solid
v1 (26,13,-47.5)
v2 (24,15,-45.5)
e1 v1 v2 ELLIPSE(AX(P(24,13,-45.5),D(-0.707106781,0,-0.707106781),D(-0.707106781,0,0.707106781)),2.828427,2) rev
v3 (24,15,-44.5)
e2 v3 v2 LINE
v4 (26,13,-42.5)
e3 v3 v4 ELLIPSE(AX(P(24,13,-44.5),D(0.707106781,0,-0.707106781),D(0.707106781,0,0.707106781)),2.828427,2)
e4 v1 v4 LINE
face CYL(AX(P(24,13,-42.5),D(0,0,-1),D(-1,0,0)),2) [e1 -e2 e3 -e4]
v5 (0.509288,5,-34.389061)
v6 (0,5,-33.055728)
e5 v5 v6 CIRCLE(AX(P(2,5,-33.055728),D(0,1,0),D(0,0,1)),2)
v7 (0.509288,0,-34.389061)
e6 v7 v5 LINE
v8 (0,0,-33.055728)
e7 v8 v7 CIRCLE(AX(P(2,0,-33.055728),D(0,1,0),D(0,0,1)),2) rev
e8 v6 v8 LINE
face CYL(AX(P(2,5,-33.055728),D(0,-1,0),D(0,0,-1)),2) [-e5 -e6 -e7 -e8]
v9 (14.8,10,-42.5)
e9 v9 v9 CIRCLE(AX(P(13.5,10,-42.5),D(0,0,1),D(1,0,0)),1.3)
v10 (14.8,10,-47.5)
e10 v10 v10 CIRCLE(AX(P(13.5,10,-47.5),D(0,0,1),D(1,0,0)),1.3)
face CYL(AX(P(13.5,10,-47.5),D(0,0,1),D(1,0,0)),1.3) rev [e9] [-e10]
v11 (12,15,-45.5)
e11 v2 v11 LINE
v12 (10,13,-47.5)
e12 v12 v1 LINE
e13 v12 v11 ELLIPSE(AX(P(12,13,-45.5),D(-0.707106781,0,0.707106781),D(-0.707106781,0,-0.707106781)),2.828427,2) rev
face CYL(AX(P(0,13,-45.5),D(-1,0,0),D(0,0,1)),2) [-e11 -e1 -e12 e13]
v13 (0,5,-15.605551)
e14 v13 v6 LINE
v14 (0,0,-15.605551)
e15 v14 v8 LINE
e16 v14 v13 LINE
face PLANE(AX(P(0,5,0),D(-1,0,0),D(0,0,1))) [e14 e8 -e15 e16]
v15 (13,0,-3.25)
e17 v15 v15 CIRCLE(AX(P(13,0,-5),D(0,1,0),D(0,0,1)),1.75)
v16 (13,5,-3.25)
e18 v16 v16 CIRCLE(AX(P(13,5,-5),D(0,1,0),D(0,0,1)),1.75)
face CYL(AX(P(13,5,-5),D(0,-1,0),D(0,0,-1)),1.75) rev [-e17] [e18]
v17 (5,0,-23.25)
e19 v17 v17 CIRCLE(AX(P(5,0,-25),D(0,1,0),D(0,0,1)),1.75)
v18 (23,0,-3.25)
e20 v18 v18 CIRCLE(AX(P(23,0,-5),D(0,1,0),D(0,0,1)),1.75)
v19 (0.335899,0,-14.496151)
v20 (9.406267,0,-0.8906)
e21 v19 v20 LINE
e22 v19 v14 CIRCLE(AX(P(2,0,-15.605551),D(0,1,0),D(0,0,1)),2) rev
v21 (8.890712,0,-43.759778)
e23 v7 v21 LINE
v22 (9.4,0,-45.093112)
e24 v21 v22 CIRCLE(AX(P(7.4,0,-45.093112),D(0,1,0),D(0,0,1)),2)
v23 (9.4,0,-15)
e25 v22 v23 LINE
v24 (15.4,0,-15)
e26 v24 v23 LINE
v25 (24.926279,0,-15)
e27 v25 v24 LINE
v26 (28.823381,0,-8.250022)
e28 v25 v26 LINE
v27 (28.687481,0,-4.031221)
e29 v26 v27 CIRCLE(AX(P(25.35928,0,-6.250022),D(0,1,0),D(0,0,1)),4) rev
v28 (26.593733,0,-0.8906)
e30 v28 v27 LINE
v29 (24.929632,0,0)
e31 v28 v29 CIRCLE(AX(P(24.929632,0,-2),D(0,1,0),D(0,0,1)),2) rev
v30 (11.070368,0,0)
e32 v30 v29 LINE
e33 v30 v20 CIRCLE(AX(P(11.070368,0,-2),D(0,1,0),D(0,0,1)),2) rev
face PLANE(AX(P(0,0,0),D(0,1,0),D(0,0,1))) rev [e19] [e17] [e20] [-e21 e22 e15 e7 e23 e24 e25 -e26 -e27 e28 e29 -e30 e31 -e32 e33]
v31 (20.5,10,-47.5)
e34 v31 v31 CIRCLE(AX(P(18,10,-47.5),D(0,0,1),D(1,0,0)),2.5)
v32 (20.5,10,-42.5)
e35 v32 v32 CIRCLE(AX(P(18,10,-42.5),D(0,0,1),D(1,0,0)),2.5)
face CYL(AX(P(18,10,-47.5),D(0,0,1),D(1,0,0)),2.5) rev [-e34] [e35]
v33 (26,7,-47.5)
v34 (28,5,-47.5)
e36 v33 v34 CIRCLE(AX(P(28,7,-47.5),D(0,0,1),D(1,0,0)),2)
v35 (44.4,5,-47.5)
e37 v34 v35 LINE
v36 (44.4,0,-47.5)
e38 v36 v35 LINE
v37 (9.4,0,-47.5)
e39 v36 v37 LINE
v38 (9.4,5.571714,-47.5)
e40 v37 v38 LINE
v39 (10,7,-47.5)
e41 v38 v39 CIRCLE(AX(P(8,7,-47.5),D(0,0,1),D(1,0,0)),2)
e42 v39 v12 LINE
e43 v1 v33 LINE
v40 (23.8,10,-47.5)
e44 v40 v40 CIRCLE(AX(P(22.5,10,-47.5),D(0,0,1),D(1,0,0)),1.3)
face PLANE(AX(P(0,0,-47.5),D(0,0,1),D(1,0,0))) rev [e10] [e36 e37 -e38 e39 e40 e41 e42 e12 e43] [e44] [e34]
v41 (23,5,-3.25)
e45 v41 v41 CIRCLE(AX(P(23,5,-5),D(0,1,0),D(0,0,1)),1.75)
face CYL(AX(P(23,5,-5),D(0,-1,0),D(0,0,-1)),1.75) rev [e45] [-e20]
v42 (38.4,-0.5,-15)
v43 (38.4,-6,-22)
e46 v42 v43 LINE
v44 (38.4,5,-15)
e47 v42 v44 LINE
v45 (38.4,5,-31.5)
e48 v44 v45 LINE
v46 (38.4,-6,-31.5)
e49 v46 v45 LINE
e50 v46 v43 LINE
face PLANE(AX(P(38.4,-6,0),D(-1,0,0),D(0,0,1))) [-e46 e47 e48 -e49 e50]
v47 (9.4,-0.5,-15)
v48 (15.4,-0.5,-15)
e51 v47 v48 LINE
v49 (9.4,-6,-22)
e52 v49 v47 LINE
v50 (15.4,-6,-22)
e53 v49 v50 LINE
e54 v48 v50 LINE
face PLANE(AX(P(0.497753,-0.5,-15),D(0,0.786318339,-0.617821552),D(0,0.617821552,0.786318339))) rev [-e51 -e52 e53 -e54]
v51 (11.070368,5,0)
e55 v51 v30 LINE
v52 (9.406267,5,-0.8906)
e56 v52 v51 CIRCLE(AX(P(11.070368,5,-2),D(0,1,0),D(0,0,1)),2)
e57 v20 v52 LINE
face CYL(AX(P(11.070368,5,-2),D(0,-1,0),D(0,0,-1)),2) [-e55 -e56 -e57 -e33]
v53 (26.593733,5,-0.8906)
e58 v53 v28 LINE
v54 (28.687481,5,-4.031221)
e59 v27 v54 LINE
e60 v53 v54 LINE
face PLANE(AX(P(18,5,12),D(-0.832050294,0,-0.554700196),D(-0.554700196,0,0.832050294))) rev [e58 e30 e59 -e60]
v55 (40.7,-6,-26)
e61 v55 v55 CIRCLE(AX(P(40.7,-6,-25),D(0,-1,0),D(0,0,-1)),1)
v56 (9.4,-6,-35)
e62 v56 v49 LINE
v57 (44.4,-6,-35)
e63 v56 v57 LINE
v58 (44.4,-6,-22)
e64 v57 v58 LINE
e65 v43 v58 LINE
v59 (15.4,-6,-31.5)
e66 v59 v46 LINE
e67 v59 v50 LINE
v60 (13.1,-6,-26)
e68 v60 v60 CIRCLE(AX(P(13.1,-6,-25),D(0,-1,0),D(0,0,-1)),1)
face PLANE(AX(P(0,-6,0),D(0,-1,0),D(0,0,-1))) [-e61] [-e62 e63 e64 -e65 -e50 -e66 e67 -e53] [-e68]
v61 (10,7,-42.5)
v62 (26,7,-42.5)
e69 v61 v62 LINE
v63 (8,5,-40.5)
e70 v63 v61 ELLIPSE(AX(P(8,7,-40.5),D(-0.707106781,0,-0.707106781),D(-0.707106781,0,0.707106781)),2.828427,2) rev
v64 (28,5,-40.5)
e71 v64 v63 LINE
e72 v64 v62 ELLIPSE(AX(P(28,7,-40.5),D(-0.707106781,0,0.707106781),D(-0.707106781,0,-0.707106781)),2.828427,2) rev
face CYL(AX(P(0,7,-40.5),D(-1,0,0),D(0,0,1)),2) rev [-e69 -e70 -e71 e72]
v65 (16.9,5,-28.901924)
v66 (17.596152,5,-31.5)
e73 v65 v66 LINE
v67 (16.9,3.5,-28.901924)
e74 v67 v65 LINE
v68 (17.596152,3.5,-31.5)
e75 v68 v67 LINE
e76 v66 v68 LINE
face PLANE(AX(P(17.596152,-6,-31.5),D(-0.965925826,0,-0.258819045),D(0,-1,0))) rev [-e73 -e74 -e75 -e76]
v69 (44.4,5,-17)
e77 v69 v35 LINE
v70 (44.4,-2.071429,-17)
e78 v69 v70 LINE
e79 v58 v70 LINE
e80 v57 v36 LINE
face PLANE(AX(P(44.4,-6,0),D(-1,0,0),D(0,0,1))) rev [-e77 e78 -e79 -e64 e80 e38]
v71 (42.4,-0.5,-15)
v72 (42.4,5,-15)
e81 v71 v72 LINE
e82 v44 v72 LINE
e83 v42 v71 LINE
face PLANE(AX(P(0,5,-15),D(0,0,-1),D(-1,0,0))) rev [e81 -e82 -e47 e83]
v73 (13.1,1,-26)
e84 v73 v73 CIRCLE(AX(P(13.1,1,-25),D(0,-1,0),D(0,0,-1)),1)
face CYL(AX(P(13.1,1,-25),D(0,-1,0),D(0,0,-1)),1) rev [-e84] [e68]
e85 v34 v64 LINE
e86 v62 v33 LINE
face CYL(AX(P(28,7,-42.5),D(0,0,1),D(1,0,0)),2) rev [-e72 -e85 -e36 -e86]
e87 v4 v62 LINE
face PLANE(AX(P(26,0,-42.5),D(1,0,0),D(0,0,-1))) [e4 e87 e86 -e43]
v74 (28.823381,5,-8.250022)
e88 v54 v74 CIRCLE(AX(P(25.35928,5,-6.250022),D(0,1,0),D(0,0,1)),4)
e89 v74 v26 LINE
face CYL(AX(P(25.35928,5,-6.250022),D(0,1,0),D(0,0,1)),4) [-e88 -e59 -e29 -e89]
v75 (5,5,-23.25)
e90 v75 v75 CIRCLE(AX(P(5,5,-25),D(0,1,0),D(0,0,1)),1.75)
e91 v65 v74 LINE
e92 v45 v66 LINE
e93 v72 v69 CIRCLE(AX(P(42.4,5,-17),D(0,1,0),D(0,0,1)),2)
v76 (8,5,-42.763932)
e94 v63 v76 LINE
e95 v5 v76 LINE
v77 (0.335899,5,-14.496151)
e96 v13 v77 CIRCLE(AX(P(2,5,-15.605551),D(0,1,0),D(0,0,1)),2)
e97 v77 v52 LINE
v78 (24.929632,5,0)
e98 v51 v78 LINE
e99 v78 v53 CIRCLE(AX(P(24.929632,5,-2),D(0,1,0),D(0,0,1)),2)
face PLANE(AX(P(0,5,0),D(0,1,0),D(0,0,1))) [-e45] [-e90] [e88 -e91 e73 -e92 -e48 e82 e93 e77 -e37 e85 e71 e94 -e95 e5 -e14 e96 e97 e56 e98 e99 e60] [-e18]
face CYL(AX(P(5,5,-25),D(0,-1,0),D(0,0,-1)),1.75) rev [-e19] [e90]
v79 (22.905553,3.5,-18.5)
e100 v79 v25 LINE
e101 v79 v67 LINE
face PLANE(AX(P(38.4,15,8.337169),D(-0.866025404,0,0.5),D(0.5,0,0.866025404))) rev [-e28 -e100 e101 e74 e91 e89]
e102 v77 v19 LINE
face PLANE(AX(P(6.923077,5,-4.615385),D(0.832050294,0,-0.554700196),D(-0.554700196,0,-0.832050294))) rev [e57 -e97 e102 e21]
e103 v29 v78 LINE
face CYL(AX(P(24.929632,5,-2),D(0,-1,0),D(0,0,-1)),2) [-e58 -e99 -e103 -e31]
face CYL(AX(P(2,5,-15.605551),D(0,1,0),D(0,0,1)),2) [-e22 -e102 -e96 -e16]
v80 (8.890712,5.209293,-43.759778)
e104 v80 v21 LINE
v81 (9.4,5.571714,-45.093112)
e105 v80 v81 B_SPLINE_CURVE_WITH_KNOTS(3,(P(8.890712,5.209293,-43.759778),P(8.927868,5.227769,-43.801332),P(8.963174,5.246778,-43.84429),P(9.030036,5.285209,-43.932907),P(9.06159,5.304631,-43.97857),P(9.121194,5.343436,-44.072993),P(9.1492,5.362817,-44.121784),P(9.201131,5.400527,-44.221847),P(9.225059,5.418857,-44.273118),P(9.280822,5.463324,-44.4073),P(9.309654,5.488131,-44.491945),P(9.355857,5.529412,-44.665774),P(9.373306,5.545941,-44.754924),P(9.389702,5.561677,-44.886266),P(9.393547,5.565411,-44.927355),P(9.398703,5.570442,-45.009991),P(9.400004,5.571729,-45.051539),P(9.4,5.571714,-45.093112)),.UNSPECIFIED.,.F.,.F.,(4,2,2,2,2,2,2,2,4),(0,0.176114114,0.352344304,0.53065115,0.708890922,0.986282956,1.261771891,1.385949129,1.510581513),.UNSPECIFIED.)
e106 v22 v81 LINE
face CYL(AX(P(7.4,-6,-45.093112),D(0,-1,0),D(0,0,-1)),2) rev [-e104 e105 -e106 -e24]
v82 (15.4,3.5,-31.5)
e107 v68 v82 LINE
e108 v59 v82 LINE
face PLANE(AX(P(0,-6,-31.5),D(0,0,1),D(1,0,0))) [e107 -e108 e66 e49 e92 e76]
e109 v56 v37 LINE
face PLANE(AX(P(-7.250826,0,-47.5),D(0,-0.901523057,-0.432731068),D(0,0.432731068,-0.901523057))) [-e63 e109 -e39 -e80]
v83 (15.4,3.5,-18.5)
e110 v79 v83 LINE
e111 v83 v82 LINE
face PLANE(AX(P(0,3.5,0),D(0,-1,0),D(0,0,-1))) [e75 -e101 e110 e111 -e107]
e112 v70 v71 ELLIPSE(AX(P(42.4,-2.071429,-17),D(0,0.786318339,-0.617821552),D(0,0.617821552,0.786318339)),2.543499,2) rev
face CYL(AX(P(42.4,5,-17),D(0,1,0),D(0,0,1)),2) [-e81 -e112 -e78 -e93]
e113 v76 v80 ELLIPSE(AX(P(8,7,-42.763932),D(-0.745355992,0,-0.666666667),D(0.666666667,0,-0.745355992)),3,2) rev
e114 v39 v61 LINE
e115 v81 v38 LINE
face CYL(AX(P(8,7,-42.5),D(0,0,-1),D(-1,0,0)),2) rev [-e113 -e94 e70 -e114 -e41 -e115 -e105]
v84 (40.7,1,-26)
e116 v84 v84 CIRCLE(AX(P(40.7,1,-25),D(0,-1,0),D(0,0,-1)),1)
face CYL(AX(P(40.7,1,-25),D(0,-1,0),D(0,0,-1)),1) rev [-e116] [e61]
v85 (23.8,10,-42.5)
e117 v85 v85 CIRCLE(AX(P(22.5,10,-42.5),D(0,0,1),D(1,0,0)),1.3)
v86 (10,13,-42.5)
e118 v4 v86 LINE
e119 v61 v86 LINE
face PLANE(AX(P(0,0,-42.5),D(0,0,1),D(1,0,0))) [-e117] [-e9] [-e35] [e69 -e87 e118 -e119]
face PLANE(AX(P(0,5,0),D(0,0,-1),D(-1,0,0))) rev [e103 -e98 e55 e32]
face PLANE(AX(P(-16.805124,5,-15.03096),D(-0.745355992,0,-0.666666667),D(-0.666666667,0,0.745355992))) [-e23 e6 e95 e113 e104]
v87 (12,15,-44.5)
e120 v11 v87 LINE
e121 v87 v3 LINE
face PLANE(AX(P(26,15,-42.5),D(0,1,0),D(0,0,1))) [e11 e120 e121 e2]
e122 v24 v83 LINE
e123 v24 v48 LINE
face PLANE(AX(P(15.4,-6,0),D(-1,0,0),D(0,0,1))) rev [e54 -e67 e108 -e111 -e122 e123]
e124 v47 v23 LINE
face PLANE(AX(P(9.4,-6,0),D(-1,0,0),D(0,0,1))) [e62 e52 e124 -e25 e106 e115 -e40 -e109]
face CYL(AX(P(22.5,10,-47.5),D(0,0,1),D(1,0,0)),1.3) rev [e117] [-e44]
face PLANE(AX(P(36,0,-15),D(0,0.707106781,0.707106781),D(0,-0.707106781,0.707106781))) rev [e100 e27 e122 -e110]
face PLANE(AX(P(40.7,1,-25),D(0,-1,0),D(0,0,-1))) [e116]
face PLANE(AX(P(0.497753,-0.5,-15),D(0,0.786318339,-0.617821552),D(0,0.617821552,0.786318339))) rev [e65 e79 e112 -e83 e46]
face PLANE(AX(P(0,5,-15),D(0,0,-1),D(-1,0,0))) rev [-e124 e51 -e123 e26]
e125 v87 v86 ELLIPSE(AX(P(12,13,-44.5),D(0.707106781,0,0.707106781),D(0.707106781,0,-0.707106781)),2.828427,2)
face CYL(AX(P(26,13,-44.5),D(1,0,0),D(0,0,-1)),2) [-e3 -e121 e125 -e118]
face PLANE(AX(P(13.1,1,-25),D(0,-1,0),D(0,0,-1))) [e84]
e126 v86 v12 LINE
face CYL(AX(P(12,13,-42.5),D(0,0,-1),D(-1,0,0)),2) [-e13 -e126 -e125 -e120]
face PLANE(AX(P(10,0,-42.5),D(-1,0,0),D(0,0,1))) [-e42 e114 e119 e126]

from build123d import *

# Parameters (mm, degrees)
SKETCH1_R                = 1.75
SKETCH1_W                = 7.2
SKETCH1_H                = 5.4
BOSS_EXTRUDE1_DEPTH      = 5
FILLET5_RADIUS           = 10
FILLET5_LENGTH           = 5
FILLET2_R                = 5.4
FILLET6_R                = 5.4
SKETCH3_W                = 35
SKETCH3_H                = 20
SKETCH3_W_2              = 23
SKETCH3_H_2              = 13
BOSS_EXTRUDE4_DEPTH      = 6
SKETCH5_W                = 23
SKETCH5_H                = 13
CUT_EXTRUDE1_DEPTH       = 3.5
CUT_EXTRUDE2_DEPTH       = 76.239617224
SKETCH9_R                = 1
CUT_EXTRUDE4_DEPTH       = 7
BOSS_EXTRUDE5_DEPTH      = 2.5
BOSS_EXTRUDE5_DEPTH_BACK = 2.5
SKETCH10_W               = 16
SKETCH10_H               = 15
SKETCH11_R               = 2.5
SKETCH11_R_2             = 1.3
CUT_EXTRUDE5_DEPTH       = 64.2661837
FILLET8_R                = 2
BOSS_EXTRUDE10_DEPTH     = 35
SKETCH13_W               = 23
SKETCH13_H               = 9.5
CUT_EXTRUDE6_DEPTH       = 3.5
CUT_EXTRUDE7_REACH       = 68.728
BOSS_EXTRUDE11_DEPTH     = 20.6
FILLET9_R                = 2
FILLET10_R               = 2
CUT_EXTRUDE9_DEPTH       = 67.029236021
CUT_EXTRUDE9_DEPTH_BACK  = 67.029236021
FILLET11_R               = 4
CHAMFER1_SIZE            = 3
CHAMFER1_SIZE2           = 2.196152423


# Read off the part's stored shape, not the designer's step: Boss-Extrude11
with BuildPart() as part:
    # Sketch1 → Boss-Extrude1 (new body)
    # profile 1 of 4: a face of its own
    with BuildSketch(Plane(origin=(0, 0, 0), x_dir=(1, 0, 0), z_dir=(0, 1, 0))):
        with BuildLine():
            Line((3.25, 25), (0, 25))
            Line((0, 25), (0, 15))
            Line((0, 15), (10, 0))
            Line((10, 0), (26, 0))
            Line((26, 0), (36, 15))
            Line((36, 15), (60, 15))
            Line((60, 15), (60, 25))
            Line((60, 25), (44.5, 25))
            Line((44.5, 25), (44.5, 19.6))
            Line((44.5, 19.6), (37.3, 19.6))
            Line((37.3, 19.6), (26.5, 19.6))
            Line((26.5, 19.6), (26.5, 25))
            Line((26.5, 25), (6.75, 25))
            ThreePointArc((6.75, 25), (5, 23.25), (3.25, 25))
        make_face()
        with Locations(Location((13, 5, 0), (0, 0, 270))):
            Circle(SKETCH1_R, mode=Mode.SUBTRACT)
        with Locations(Location((23, 5, 0), (0, 0, 270))):
            Circle(SKETCH1_R, mode=Mode.SUBTRACT)
    # profile 2 of 4: a face of its own
    with BuildSketch(Plane(origin=(0, 0, 0), x_dir=(1, 0, 0), z_dir=(0, 1, 0))):
        with BuildLine():
            Line((10, 45), (0, 33.819660113))
            Line((0, 33.819660113), (0, 25))
            Line((0, 25), (3.25, 25))
            ThreePointArc((3.25, 25), (5, 26.75), (6.75, 25))
            Line((6.75, 25), (26.5, 25))
            Line((26.5, 25), (26.5, 30.4))
            Line((26.5, 30.4), (37.3, 30.4))
            Line((37.3, 30.4), (44.5, 30.4))
            Line((44.5, 30.4), (44.5, 25))
            Line((44.5, 25), (60, 25))
            Line((60, 25), (60, 35))
            Line((60, 35), (36, 35))
            Line((36, 35), (26, 45))
            Line((26, 45), (10, 45))
        make_face()
    # profile 3 of 4: a face of its own
    with BuildSketch(Plane(origin=(0, 0, 0), x_dir=(1, 0, 0), z_dir=(0, 1, 0))):
        with Locations((40.9, 27.7)):
            Rectangle(SKETCH1_W, SKETCH1_H)
    # profile 4 of 4: a face of its own
    with BuildSketch(Plane(origin=(0, 0, 0), x_dir=(1, 0, 0), z_dir=(0, 1, 0))):
        with Locations((40.9, 22.3)):
            Rectangle(SKETCH1_W, SKETCH1_H)
    extrude(amount=BOSS_EXTRUDE1_DEPTH)

    # Fillet5: full round fillet: the end face becomes a half cylinder, R = half its width
    fillet5_face = Plane((60, 2.5, -25), x_dir=(0, -1, 0), z_dir=(1, 0, 0))  # on the end face: x along it, z out of the body
    fillet5_slab = fillet5_face.offset(-FILLET5_RADIUS / 2) * Box(FILLET5_LENGTH, 2 * FILLET5_RADIUS, FILLET5_RADIUS, mode=Mode.PRIVATE)  # the body's end, R deep
    fillet5_round = Plane((50, 2.5, -25), x_dir=(1, 0, 0), z_dir=(0, -1, 0)) * Cylinder(FILLET5_RADIUS, FILLET5_LENGTH, mode=Mode.PRIVATE)  # its axis R under the face
    add(fillet5_slab - fillet5_round, mode=Mode.SUBTRACT)

    # Fillet2
    fillet2_edges = [part.edges().sort_by_distance(p)[0] for p in [
        (26.5, 2.5, -30.4),
        (26.5, 2.5, -19.6),
    ]]
    fillet(fillet2_edges, radius=FILLET2_R - 0.0001)  # a hair under: the kernel refuses the full size

    # Fillet6
    fillet6_edges = [part.edges().sort_by_distance(p)[0] for p in [
        (37.3, 2.5, -19.6),
        (37.3, 2.5, -30.4),
    ]]
    fillet(fillet6_edges, radius=FILLET6_R - 0.0001)  # a hair under: the kernel refuses the full size

    # Sketch3 → Boss-Extrude4 (add)
    with BuildSketch(Plane.XZ):
        with Locations((26.9, -25)):
            Rectangle(SKETCH3_W, SKETCH3_H)
        with Locations((26.9, -25)):
            Rectangle(SKETCH3_W_2, SKETCH3_H_2, mode=Mode.SUBTRACT)
    extrude(amount=BOSS_EXTRUDE4_DEPTH)

    # Sketch5 → Cut-Extrude1 (cut)
    with BuildSketch(Plane.XZ):
        with Locations((26.9, -25)):
            Rectangle(SKETCH5_W, SKETCH5_H)
    extrude(amount=-CUT_EXTRUDE1_DEPTH, mode=Mode.SUBTRACT)

    # Sketch6 → Cut-Extrude2 (cut, through all)
    with BuildSketch(Plane.XZ):
        with BuildLine():
            Line((44.4, -15), (44.4, -35))
            Line((44.4, -35), (50, -35))
            ThreePointArc((50, -35), (60, -25), (50, -15))
            Line((50, -15), (44.4, -15))
        make_face()
    extrude(amount=-CUT_EXTRUDE2_DEPTH, mode=Mode.SUBTRACT)

    # Sketch9 → Cut-Extrude4 (cut)
    with BuildSketch(Plane.XZ.offset(6)):
        with Locations(Location((13.1, -25, 0), (0, 0, 270))):
            Circle(SKETCH9_R)
        with Locations(Location((40.7, -25, 0), (0, 0, 270))):
            Circle(SKETCH9_R)
    extrude(amount=-CUT_EXTRUDE4_DEPTH, mode=Mode.SUBTRACT)

    # Sketch10 → Boss-Extrude5 (add, two sides: drawn at the far end of the back side and taken through both)
    with BuildSketch(Plane(origin=(0, 0, -45), x_dir=(-1, 0, 0), z_dir=(0, 0, -1)).offset(-BOSS_EXTRUDE5_DEPTH_BACK)):
        with Locations((-18, 7.5)):
            Rectangle(SKETCH10_W, SKETCH10_H)
    extrude(amount=BOSS_EXTRUDE5_DEPTH + BOSS_EXTRUDE5_DEPTH_BACK)

    # Sketch11 → Cut-Extrude5 (cut, through all)
    with BuildSketch(Plane.XY.offset(-42.5)):
        with Locations((18, 10)):
            Circle(SKETCH11_R)
        with Locations((22.5, 10)):
            Circle(SKETCH11_R_2)
        with Locations((13.5, 10)):
            Circle(SKETCH11_R_2)
    extrude(amount=-CUT_EXTRUDE5_DEPTH, mode=Mode.SUBTRACT)

    # Fillet8
    fillet8_edges = [part.edges().sort_by_distance(p)[0] for p in [
        (26, 15, -45),
        (18, 15, -42.5),
        (10, 15, -45),
        (18, 15, -47.5),
    ]]
    fillet(fillet8_edges, radius=FILLET8_R)

    # Sketch12 → Boss-Extrude10 (add)
    with BuildSketch(Plane(origin=(44.4, 0, 0), x_dir=(0, 0, -1), z_dir=(1, 0, 0))):
        Polygon((35, -6), (35, 5), (47.5, 5), (47.5, 0), align=None)
    extrude(amount=-BOSS_EXTRUDE10_DEPTH)

    # Sketch13 → Cut-Extrude6 (cut)
    with BuildSketch(Plane(origin=(0, 0, -18.5), x_dir=(-1, 0, 0), z_dir=(0, 0, -1))):
        with Locations((-26.9, -1.25)):
            Rectangle(SKETCH13_W, SKETCH13_H)
    extrude(amount=-CUT_EXTRUDE6_DEPTH, mode=Mode.SUBTRACT)

    # Cut-Extrude7: up to this face of the body (flat: up to its plane)
    cut_extrude7_end = Plane(part.part.faces().sort_by_distance((9.4, -2.280677184, -29.977280777))[0])
    # Sketch14 → Cut-Extrude7 (cut, up to the picked face)
    with BuildSketch(Plane(origin=(44.4, 0, 0), x_dir=(0, 0, -1), z_dir=(1, 0, 0)), mode=Mode.PRIVATE) as cut_extrude7_sk1:
        Polygon((15, -0.5), (22, -6), (15, -6), align=None)
    cut_extrude7_tool1 = split(extrude(cut_extrude7_sk1.sketch, amount=-CUT_EXTRUDE7_REACH, mode=Mode.PRIVATE), bisect_by=cut_extrude7_end, keep=Keep.BOTH, mode=Mode.PRIVATE)
    add(cut_extrude7_tool1.solids().sort_by(Axis((44.4, -4.166667, -17.333333), (-1, 0, 0)))[0], mode=Mode.SUBTRACT)

    # Boss-Extrude11 outline → Boss-Extrude11 (add)
    with BuildSketch(Plane(origin=(15.4, 0, 0), x_dir=(0, 0, -1), z_dir=(1, 0, 0))):
        Polygon((15, 0), (18.5, 3.5), (15, 3.5), align=None)
    extrude(amount=BOSS_EXTRUDE11_DEPTH)

    # Fillet9
    fillet9_edges = [part.edges().sort_by_distance(p)[0] for p in [
        (9.4, 2.5, -44.329179607),
        (44.4, 2.25, -15),
        (36, 4.25, -15),
        (26, 2.5, 0),
        (10, 2.5, 0),
        (0, 2.5, -15),
        (0, 2.5, -33.819660113),
    ]]
    fillet(fillet9_edges, radius=FILLET9_R)

    # Fillet10
    fillet10_edges = [part.edges().sort_by_distance(p)[0] for p in [
        (10, 5, -45),
        (26, 5, -45),
        (18, 5, -42.5),
    ]]
    fillet(fillet10_edges, radius=FILLET10_R)

    # Sketch18 → Cut-Extrude9 (cut, two sides: drawn at the far end of the back side and taken through both)
    with BuildSketch(Plane.XZ.offset(-3.5).offset(-CUT_EXTRUDE9_DEPTH_BACK)):
        Polygon((15.4, -31.5), (38.4, -31.5), (38.4, 8.337168574), align=None)
    extrude(amount=CUT_EXTRUDE9_DEPTH + CUT_EXTRUDE9_DEPTH_BACK, mode=Mode.SUBTRACT)

    # Fillet11
    fillet11_edges = [part.edges().sort_by_distance(p)[0] for p in [
        (30.065611038, 2.5, -6.098416558),
    ]]
    fillet(fillet11_edges, radius=FILLET11_R)

    # Chamfer1
    chamfer1_edges = [part.edges().sort_by_distance(p)[0] for p in [
        (15.4, 4.25, -31.5),
    ]]
    chamfer1_side = [part.faces().sort_by_distance(p)[0] for p in [
        (24.055872114, 3.154417612, -16.507589715),
    ]]
    chamfer(chamfer1_edges, length=CHAMFER1_SIZE, length2=CHAMFER1_SIZE2, reference=chamfer1_side[0])


solid = part.part
